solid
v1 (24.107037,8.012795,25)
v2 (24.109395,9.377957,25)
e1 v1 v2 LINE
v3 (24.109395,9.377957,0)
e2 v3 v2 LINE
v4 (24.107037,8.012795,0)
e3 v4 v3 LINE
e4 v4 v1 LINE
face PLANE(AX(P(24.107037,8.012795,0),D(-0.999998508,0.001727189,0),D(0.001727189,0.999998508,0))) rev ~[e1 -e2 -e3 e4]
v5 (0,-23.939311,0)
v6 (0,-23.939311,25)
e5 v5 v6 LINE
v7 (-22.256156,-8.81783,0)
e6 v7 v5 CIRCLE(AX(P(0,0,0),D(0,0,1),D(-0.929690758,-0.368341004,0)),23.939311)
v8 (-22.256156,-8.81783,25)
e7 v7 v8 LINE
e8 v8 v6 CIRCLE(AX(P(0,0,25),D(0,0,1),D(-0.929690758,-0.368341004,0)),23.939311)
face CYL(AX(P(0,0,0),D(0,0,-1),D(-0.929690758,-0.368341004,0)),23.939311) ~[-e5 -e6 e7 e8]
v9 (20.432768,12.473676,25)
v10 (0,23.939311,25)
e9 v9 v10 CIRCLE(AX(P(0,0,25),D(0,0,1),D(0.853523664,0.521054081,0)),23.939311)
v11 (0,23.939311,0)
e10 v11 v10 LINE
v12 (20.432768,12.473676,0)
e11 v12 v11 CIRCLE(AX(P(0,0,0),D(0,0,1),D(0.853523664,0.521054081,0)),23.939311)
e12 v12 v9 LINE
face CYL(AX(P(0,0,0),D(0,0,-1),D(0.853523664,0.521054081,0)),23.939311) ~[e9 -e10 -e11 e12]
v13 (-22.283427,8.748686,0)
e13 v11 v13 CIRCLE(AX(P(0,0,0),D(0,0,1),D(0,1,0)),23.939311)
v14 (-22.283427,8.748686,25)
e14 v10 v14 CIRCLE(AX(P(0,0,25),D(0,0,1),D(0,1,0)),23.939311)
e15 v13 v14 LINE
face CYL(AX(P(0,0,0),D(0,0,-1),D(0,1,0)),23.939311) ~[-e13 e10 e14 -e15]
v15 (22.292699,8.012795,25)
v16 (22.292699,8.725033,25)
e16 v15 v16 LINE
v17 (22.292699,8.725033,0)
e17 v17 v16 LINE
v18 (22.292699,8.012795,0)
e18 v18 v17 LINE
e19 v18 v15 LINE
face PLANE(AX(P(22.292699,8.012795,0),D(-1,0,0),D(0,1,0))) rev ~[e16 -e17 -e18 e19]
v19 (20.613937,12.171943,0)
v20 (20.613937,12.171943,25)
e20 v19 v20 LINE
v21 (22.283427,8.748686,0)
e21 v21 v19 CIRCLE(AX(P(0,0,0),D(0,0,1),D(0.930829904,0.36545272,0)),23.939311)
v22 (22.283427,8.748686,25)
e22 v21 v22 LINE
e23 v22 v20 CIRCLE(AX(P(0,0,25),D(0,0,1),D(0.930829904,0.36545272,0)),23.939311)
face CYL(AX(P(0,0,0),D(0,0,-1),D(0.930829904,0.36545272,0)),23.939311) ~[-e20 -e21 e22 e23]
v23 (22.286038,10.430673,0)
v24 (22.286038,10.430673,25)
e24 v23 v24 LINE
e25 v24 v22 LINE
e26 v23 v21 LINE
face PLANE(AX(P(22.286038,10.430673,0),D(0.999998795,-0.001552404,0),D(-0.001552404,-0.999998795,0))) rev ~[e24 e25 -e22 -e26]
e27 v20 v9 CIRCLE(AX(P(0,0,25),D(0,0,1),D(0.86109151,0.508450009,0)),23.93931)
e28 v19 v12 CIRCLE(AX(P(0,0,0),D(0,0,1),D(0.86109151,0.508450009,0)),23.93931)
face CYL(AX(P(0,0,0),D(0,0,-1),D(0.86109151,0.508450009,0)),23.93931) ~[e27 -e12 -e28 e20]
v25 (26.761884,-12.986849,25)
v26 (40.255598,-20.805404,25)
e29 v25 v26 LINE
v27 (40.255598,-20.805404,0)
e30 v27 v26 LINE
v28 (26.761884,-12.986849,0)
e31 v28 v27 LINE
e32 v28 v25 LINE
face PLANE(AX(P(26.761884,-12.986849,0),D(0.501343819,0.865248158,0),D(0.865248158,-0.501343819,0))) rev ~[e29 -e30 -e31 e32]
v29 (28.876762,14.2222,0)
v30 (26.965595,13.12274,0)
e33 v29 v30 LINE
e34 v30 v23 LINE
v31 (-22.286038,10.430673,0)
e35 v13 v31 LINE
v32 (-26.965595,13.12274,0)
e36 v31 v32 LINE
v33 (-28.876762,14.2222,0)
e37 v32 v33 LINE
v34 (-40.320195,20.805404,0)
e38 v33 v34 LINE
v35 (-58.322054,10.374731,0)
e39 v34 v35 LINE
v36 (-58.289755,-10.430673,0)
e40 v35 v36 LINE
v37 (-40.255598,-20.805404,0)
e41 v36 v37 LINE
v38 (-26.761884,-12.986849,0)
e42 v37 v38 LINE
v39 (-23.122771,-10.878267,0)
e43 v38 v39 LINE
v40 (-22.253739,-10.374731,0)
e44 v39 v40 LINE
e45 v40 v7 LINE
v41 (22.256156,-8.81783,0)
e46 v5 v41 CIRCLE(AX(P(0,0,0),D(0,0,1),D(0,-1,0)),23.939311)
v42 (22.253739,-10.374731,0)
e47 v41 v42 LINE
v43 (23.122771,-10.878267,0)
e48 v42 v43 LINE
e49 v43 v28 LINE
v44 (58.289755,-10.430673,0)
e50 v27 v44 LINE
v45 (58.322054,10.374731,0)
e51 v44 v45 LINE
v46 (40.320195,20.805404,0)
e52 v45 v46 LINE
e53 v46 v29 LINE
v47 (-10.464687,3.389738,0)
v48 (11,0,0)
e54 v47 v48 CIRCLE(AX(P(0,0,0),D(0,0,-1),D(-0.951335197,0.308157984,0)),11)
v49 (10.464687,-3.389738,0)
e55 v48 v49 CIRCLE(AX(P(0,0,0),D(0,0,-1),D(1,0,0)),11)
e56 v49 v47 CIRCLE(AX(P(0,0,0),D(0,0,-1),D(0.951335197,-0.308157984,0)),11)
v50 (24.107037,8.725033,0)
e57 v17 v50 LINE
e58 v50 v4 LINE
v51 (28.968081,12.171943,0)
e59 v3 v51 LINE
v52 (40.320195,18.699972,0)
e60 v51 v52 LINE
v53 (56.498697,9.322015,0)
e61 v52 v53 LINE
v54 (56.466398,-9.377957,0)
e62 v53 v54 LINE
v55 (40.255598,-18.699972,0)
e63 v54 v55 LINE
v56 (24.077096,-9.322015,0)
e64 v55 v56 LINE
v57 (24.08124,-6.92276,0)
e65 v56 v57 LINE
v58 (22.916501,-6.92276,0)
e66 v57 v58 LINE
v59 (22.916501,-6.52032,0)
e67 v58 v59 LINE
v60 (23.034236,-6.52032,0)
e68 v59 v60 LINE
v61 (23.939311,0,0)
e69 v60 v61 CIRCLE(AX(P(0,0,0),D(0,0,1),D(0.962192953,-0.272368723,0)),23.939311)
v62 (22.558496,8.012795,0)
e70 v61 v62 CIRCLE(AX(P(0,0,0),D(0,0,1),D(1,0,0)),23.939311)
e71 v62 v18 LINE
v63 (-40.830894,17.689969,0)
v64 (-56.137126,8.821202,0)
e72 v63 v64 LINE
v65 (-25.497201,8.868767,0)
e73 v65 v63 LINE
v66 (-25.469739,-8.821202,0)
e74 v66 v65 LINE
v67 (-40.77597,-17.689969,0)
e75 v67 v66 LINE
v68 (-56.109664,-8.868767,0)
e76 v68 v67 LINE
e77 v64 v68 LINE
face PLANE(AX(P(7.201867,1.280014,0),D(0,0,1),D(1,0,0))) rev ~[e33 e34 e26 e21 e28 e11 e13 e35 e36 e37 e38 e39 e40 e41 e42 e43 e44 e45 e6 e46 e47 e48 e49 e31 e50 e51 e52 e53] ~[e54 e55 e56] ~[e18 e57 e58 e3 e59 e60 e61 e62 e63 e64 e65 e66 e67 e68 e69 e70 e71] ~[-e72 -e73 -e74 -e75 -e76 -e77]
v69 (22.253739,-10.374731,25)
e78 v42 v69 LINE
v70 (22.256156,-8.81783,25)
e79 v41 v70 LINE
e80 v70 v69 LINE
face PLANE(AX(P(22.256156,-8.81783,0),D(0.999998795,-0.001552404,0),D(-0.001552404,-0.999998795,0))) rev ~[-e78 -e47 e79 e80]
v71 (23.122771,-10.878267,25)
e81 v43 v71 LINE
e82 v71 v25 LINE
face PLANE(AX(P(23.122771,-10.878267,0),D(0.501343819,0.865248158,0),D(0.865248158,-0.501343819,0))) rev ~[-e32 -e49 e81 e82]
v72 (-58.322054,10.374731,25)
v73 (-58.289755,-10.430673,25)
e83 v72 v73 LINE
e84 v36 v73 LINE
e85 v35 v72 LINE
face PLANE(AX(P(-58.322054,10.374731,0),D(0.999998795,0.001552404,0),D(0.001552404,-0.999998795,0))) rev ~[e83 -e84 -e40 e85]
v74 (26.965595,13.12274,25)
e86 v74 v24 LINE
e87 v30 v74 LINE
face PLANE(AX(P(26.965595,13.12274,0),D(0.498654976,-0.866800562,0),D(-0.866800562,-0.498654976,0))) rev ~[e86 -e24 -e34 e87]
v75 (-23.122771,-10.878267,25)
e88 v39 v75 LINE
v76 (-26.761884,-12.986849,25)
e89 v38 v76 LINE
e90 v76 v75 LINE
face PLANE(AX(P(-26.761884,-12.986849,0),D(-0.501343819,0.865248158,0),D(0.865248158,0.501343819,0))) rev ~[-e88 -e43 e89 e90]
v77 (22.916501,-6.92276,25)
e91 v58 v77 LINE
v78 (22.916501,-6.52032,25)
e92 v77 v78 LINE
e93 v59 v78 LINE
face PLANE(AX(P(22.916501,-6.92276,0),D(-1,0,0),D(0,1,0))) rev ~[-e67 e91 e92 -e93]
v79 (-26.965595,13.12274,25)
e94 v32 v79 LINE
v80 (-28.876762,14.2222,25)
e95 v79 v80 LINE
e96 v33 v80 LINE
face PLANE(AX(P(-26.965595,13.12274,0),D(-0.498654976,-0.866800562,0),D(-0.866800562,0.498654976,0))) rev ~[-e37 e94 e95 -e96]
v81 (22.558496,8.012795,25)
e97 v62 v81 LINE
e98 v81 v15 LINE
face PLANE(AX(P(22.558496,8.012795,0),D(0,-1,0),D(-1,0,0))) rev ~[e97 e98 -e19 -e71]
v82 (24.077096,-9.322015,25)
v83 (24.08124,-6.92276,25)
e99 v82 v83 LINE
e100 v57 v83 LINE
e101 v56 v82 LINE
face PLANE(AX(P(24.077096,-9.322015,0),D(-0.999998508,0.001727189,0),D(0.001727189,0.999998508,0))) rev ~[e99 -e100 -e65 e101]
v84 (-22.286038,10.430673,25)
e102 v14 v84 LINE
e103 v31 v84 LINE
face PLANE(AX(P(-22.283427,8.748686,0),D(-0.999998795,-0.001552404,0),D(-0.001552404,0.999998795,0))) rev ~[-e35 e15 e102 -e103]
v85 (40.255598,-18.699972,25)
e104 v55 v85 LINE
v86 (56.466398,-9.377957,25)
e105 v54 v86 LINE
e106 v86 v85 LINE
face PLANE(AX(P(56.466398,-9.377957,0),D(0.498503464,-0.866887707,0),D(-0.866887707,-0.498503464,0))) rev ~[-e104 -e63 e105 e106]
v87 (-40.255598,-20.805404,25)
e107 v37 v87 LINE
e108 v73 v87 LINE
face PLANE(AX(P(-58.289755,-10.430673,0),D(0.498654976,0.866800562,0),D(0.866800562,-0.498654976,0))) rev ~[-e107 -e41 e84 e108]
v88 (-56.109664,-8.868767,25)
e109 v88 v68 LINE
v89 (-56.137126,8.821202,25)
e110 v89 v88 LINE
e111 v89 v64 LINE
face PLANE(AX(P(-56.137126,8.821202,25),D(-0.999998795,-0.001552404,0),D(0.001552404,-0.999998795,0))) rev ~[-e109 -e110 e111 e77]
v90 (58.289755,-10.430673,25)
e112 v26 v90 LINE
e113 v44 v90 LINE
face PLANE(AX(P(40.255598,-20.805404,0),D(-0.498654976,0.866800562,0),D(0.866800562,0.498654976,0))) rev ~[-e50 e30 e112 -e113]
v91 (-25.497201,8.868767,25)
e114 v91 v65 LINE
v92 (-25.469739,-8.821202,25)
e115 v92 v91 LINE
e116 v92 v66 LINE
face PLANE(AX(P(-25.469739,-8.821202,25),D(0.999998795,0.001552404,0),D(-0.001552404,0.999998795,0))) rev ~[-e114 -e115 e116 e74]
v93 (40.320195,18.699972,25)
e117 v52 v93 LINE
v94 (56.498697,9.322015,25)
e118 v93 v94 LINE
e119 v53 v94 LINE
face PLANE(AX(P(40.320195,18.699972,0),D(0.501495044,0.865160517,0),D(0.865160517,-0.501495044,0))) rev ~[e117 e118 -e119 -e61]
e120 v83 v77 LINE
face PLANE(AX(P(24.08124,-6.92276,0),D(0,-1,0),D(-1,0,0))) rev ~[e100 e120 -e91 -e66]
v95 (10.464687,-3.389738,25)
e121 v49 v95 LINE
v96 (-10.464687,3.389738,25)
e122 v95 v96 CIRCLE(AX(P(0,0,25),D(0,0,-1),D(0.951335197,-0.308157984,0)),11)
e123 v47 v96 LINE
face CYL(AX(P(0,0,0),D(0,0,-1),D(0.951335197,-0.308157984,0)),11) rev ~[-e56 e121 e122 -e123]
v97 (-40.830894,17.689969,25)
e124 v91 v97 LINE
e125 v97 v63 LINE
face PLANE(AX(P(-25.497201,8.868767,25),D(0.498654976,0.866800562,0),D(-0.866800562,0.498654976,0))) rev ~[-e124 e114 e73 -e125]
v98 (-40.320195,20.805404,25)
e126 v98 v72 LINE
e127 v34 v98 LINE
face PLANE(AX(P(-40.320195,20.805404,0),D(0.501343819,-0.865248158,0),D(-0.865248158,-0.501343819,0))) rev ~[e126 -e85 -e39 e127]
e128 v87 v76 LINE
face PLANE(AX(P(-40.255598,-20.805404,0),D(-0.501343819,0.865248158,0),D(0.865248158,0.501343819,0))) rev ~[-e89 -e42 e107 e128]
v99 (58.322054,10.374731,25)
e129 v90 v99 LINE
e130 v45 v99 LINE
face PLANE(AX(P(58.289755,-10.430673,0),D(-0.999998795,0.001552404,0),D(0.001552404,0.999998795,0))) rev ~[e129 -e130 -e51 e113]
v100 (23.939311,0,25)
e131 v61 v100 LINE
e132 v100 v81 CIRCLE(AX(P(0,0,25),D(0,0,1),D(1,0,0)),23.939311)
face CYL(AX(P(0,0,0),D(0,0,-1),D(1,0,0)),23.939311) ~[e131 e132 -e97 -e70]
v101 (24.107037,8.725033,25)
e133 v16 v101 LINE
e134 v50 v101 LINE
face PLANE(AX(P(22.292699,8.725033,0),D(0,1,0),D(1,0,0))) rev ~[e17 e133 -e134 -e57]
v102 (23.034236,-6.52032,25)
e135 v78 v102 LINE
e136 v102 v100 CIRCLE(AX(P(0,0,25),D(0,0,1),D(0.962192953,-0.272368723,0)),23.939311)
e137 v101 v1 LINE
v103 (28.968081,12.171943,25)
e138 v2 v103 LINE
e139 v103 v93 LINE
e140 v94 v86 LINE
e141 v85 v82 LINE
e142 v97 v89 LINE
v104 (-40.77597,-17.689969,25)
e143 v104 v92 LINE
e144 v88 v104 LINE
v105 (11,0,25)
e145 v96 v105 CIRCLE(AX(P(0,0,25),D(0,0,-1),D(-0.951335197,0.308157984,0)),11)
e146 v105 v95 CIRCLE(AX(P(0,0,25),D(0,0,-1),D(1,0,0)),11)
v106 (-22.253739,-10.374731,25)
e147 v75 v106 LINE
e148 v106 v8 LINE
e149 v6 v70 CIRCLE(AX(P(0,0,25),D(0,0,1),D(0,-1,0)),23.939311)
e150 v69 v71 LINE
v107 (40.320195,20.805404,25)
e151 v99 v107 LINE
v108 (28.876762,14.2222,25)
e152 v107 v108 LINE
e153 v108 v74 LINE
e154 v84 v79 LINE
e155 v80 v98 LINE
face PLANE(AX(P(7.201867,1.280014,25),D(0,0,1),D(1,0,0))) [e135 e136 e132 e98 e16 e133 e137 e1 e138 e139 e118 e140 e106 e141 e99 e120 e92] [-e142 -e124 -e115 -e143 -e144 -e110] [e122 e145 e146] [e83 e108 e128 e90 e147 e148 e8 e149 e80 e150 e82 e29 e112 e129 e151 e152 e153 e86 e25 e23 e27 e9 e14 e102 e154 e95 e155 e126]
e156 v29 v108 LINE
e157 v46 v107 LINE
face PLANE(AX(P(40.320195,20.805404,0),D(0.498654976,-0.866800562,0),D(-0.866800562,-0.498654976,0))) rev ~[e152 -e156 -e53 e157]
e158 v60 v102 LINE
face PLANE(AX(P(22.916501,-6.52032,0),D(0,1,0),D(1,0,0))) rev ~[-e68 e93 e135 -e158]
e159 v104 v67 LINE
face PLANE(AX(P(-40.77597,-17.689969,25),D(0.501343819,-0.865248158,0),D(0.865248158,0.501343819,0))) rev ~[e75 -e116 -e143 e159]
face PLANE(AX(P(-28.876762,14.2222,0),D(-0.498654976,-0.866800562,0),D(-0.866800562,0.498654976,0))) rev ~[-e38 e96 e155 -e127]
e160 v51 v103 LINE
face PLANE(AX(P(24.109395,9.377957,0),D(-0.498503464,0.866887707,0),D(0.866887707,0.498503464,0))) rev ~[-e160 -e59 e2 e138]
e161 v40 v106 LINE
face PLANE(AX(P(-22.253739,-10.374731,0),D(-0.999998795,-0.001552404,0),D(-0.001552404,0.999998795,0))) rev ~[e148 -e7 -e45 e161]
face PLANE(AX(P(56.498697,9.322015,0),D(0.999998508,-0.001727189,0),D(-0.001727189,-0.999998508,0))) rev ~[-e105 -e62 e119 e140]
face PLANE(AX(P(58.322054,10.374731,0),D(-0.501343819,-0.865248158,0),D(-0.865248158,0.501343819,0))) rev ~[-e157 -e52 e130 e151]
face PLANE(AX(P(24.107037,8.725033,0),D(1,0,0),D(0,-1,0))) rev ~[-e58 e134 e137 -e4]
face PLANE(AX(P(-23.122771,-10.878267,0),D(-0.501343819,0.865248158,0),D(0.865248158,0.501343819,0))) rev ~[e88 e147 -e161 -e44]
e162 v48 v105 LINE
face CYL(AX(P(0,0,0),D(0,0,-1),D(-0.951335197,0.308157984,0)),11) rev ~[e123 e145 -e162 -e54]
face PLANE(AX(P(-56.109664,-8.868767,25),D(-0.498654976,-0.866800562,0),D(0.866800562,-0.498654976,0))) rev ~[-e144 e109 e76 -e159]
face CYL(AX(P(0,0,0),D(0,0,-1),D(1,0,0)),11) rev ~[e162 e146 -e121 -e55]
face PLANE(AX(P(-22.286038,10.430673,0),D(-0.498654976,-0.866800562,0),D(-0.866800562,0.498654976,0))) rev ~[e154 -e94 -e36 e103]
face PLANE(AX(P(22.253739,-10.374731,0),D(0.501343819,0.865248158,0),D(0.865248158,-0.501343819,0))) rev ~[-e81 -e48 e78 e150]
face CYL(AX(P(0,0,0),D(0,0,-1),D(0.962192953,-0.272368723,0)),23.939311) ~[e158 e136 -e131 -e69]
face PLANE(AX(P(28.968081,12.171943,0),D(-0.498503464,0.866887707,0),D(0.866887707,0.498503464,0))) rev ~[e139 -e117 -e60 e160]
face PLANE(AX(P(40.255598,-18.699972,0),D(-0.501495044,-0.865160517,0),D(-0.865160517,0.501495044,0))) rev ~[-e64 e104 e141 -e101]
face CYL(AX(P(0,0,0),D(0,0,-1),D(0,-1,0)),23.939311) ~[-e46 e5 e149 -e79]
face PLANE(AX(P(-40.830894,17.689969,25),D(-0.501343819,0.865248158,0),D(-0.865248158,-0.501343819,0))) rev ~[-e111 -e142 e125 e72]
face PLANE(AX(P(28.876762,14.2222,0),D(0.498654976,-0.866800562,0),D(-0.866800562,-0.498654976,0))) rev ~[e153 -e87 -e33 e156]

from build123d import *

# Parameters (mm, degrees)
F1_DEPTH = 25
F3_DEPTH = 25


with BuildPart() as f1:
    # F0 (on Top) → F1 (new body)
    with BuildSketch(Plane.XY):
        with BuildLine():
            ThreePointArc((-10.4646871668, 3.3897378218), (1.7158731254, 10.8653476437), (11, 0))
            ThreePointArc((11, 0), (10.8653476437, -1.7158731254), (10.4646871668, -3.3897378218))
            ThreePointArc((10.4646871668, -3.3897378218), (11.5303364364, -16.8717211773), (0, -23.9393109523))
            ThreePointArc((0, -23.9393109523), (13.4535838876, -19.8013052461), (22.2561561395, -8.8178298218))
            Line((22.2561561395, -8.8178298218), (22.2834265087, 8.7486862959))
            ThreePointArc((22.2834265087, 8.7486862959), (21.5168684816, 10.4935684883), (20.6139374132, 12.1719428685))
            Line((20.6139374132, 12.1719428685), (20.4327683896, 12.1719428685))
            Line((20.4327683896, 12.1719428685), (20.4327683896, 12.4736756736))
            ThreePointArc((20.4327683896, 12.4736756736), (11.7149350874, 20.8770425293), (0, 23.9393109523))
            ThreePointArc((0, 23.9393109523), (-11.5303364364, 16.8717211773), (-10.4646871668, 3.3897378218))
        make_face()
        with BuildLine():
            ThreePointArc((10.4646871668, -3.3897378218), (-3.3897378218, -10.4646871668), (-10.4646871668, 3.3897378218))
            ThreePointArc((-10.4646871668, 3.3897378218), (-11.5303364364, 16.8717211773), (0, 23.9393109523))
            ThreePointArc((0, 23.9393109523), (-13.4843073091, 19.7803959836), (-22.2834265087, 8.7486862959))
            Line((-22.2834265087, 8.7486862959), (-22.2561561395, -8.8178298218))
            ThreePointArc((-22.2561561395, -8.8178298218), (-13.4535838876, -19.8013052461), (0, -23.9393109523))
            ThreePointArc((0, -23.9393109523), (11.5303364364, -16.8717211773), (10.4646871668, -3.3897378218))
        make_face()
        with BuildLine():
            ThreePointArc((20.6139374132, 12.1719428685), (20.5239074006, 12.3231422082), (20.4327683896, 12.4736756736))
            Line((20.4327683896, 12.4736756736), (20.4327683896, 12.1719428685))
            Line((20.4327683896, 12.1719428685), (20.6139374132, 12.1719428685))
        make_face()
        with BuildLine():
            Line((-22.2561561395, -8.8178298218), (-22.2834265087, 8.7486862959))
            ThreePointArc((-22.2834265087, 8.7486862959), (-22.3171762669, 8.6622313721), (-22.3505905999, 8.5756462558))
            ThreePointArc((-22.3505905999, 8.5756462558), (-22.9180889493, 6.917500111), (-23.3627568452, 5.2222793359))
            ThreePointArc((-23.3627568452, 5.2222793359), (-23.9236754966, -0.865077803), (-22.9245601537, -6.8960242628))
            ThreePointArc((-22.9245601537, -6.8960242628), (-22.876956445, -7.0523381007), (-22.8282869054, -7.2083233721))
            ThreePointArc((-22.8282869054, -7.2083233721), (-22.5565817206, -8.0181812122), (-22.2561561395, -8.8178298218))
        make_face()
        with BuildLine():
            ThreePointArc((-22.3505905999, 8.5756462558), (-22.3171762669, 8.6622313721), (-22.2834265087, 8.7486862959))
            Line((-22.2834265087, 8.7486862959), (-22.2860376354, 10.4306730632))
            Line((-22.2860376354, 10.4306730632), (-26.9655953528, 13.1227395452))
            Line((-26.9655953528, 13.1227395452), (-28.876762415, 14.2222000286))
            Line((-28.876762415, 14.2222000286), (-40.3201948997, 20.8054035902))
            Line((-40.3201948997, 20.8054035902), (-58.3220537256, 10.374730527))
            Line((-58.3220537256, 10.374730527), (-58.2897552873, -10.4306730632))
            Line((-58.2897552873, -10.4306730632), (-40.2555980231, -20.8054035902))
            Line((-40.2555980231, -20.8054035902), (-26.7618837097, -12.9868486414))
            Line((-26.7618837097, -12.9868486414), (-23.1227707365, -10.8782665205))
            Line((-23.1227707365, -10.8782665205), (-22.2537391971, -10.374730527))
            Line((-22.2537391971, -10.374730527), (-22.2561561395, -8.8178298218))
            ThreePointArc((-22.2561561395, -8.8178298218), (-22.5565817206, -8.0181812122), (-22.8282869054, -7.2083233721))
            ThreePointArc((-22.8282869054, -7.2083233721), (-22.876956445, -7.0523381007), (-22.9245601537, -6.8960242628))
            ThreePointArc((-22.9245601537, -6.8960242628), (-23.9236754966, -0.865077803), (-23.3627568452, 5.2222793359))
            ThreePointArc((-23.3627568452, 5.2222793359), (-22.9180889493, 6.917500111), (-22.3505905999, 8.5756462558))
        make_face()
        with BuildLine():
            Line((22.2834265087, 8.7486862959), (22.2561561395, -8.8178298218))
            ThreePointArc((22.2561561395, -8.8178298218), (22.6061950021, -7.8772175544), (22.9165006409, -6.9227600889))
            Line((22.9165006409, -6.9227600889), (22.9165006409, -6.5203195466))
            Line((22.9165006409, -6.5203195466), (23.0342362991, -6.5203195466))
            ThreePointArc((23.0342362991, -6.5203195466), (23.7119627423, -3.291417898), (23.9393109523, 0))
            ThreePointArc((23.9393109523, 0), (23.5915816395, 4.0654501127), (22.5584955519, 8.0127952242))
            Line((22.5584955519, 8.0127952242), (22.2926987152, 8.0127952242))
            Line((22.2926987152, 8.0127952242), (22.2926987152, 8.7250325423))
            ThreePointArc((22.2926987152, 8.7250325423), (22.2880657498, 8.7368606491), (22.2834265087, 8.7486862959))
        make_face()
        with BuildLine():
            ThreePointArc((22.9165006409, -6.9227600889), (22.6061950021, -7.8772175544), (22.2561561395, -8.8178298218))
            Line((22.2561561395, -8.8178298218), (22.2537391971, -10.374730527))
            Line((22.2537391971, -10.374730527), (23.1227707365, -10.8782665205))
            Line((23.1227707365, -10.8782665205), (26.7618837097, -12.9868486414))
            Line((26.7618837097, -12.9868486414), (40.2555980231, -20.8054035902))
            Line((40.2555980231, -20.8054035902), (58.2897552873, -10.4306730632))
            Line((58.2897552873, -10.4306730632), (58.3220537256, 10.374730527))
            Line((58.3220537256, 10.374730527), (40.3201948997, 20.8054035902))
            Line((40.3201948997, 20.8054035902), (28.876762415, 14.2222000286))
            Line((28.876762415, 14.2222000286), (28.9680806238, 14.2222000286))
            Line((28.9680806238, 14.2222000286), (28.9680806238, 12.1719428685))
            Line((28.9680806238, 12.1719428685), (40.3201948997, 18.6999721072))
            Line((40.3201948997, 18.6999721072), (56.4986965755, 9.3220147855))
            Line((56.4986965755, 9.3220147855), (56.4663981371, -9.3779573217))
            Line((56.4663981371, -9.3779573217), (40.2555980231, -18.6999721072))
            Line((40.2555980231, -18.6999721072), (24.0770963473, -9.3220147855))
            Line((24.0770963473, -9.3220147855), (24.0812403203, -6.9227600889))
            Line((24.0812403203, -6.9227600889), (22.9165006409, -6.9227600889))
        make_face()
        with BuildLine():
            Line((22.2860376354, 10.4306730632), (22.2834265087, 8.7486862959))
            ThreePointArc((22.2834265087, 8.7486862959), (22.2880657498, 8.7368606491), (22.2926987152, 8.7250325423))
            Line((22.2926987152, 8.7250325423), (24.1070368889, 8.7250325423))
            Line((24.1070368889, 8.7250325423), (24.1070368889, 8.0127952242))
            Line((24.1070368889, 8.0127952242), (24.1093947856, 9.3779573217))
            Line((24.1093947856, 9.3779573217), (28.9680806238, 12.1719428685))
            Line((28.9680806238, 12.1719428685), (28.9680806238, 14.2222000286))
            Line((28.9680806238, 14.2222000286), (28.876762415, 14.2222000286))
            Line((28.876762415, 14.2222000286), (26.9655953528, 13.1227395452))
            Line((26.9655953528, 13.1227395452), (22.2860376354, 10.4306730632))
        make_face()
    extrude(amount=F1_DEPTH)

    # F2 (on face) → F3 (cut)
    with BuildSketch(Plane.XY.offset(25)):
        Polygon((-56.1096642619, -8.8687674562), (-40.7759704459, -17.6899693007), (-25.4697386486, -8.8212018445), (-25.4972006673, 8.8687674562), (-40.8308944833, 17.6899693007), (-56.1371262806, 8.8212018445), align=None)
    extrude(amount=-F3_DEPTH, mode=Mode.SUBTRACT)


solid = f1.part
